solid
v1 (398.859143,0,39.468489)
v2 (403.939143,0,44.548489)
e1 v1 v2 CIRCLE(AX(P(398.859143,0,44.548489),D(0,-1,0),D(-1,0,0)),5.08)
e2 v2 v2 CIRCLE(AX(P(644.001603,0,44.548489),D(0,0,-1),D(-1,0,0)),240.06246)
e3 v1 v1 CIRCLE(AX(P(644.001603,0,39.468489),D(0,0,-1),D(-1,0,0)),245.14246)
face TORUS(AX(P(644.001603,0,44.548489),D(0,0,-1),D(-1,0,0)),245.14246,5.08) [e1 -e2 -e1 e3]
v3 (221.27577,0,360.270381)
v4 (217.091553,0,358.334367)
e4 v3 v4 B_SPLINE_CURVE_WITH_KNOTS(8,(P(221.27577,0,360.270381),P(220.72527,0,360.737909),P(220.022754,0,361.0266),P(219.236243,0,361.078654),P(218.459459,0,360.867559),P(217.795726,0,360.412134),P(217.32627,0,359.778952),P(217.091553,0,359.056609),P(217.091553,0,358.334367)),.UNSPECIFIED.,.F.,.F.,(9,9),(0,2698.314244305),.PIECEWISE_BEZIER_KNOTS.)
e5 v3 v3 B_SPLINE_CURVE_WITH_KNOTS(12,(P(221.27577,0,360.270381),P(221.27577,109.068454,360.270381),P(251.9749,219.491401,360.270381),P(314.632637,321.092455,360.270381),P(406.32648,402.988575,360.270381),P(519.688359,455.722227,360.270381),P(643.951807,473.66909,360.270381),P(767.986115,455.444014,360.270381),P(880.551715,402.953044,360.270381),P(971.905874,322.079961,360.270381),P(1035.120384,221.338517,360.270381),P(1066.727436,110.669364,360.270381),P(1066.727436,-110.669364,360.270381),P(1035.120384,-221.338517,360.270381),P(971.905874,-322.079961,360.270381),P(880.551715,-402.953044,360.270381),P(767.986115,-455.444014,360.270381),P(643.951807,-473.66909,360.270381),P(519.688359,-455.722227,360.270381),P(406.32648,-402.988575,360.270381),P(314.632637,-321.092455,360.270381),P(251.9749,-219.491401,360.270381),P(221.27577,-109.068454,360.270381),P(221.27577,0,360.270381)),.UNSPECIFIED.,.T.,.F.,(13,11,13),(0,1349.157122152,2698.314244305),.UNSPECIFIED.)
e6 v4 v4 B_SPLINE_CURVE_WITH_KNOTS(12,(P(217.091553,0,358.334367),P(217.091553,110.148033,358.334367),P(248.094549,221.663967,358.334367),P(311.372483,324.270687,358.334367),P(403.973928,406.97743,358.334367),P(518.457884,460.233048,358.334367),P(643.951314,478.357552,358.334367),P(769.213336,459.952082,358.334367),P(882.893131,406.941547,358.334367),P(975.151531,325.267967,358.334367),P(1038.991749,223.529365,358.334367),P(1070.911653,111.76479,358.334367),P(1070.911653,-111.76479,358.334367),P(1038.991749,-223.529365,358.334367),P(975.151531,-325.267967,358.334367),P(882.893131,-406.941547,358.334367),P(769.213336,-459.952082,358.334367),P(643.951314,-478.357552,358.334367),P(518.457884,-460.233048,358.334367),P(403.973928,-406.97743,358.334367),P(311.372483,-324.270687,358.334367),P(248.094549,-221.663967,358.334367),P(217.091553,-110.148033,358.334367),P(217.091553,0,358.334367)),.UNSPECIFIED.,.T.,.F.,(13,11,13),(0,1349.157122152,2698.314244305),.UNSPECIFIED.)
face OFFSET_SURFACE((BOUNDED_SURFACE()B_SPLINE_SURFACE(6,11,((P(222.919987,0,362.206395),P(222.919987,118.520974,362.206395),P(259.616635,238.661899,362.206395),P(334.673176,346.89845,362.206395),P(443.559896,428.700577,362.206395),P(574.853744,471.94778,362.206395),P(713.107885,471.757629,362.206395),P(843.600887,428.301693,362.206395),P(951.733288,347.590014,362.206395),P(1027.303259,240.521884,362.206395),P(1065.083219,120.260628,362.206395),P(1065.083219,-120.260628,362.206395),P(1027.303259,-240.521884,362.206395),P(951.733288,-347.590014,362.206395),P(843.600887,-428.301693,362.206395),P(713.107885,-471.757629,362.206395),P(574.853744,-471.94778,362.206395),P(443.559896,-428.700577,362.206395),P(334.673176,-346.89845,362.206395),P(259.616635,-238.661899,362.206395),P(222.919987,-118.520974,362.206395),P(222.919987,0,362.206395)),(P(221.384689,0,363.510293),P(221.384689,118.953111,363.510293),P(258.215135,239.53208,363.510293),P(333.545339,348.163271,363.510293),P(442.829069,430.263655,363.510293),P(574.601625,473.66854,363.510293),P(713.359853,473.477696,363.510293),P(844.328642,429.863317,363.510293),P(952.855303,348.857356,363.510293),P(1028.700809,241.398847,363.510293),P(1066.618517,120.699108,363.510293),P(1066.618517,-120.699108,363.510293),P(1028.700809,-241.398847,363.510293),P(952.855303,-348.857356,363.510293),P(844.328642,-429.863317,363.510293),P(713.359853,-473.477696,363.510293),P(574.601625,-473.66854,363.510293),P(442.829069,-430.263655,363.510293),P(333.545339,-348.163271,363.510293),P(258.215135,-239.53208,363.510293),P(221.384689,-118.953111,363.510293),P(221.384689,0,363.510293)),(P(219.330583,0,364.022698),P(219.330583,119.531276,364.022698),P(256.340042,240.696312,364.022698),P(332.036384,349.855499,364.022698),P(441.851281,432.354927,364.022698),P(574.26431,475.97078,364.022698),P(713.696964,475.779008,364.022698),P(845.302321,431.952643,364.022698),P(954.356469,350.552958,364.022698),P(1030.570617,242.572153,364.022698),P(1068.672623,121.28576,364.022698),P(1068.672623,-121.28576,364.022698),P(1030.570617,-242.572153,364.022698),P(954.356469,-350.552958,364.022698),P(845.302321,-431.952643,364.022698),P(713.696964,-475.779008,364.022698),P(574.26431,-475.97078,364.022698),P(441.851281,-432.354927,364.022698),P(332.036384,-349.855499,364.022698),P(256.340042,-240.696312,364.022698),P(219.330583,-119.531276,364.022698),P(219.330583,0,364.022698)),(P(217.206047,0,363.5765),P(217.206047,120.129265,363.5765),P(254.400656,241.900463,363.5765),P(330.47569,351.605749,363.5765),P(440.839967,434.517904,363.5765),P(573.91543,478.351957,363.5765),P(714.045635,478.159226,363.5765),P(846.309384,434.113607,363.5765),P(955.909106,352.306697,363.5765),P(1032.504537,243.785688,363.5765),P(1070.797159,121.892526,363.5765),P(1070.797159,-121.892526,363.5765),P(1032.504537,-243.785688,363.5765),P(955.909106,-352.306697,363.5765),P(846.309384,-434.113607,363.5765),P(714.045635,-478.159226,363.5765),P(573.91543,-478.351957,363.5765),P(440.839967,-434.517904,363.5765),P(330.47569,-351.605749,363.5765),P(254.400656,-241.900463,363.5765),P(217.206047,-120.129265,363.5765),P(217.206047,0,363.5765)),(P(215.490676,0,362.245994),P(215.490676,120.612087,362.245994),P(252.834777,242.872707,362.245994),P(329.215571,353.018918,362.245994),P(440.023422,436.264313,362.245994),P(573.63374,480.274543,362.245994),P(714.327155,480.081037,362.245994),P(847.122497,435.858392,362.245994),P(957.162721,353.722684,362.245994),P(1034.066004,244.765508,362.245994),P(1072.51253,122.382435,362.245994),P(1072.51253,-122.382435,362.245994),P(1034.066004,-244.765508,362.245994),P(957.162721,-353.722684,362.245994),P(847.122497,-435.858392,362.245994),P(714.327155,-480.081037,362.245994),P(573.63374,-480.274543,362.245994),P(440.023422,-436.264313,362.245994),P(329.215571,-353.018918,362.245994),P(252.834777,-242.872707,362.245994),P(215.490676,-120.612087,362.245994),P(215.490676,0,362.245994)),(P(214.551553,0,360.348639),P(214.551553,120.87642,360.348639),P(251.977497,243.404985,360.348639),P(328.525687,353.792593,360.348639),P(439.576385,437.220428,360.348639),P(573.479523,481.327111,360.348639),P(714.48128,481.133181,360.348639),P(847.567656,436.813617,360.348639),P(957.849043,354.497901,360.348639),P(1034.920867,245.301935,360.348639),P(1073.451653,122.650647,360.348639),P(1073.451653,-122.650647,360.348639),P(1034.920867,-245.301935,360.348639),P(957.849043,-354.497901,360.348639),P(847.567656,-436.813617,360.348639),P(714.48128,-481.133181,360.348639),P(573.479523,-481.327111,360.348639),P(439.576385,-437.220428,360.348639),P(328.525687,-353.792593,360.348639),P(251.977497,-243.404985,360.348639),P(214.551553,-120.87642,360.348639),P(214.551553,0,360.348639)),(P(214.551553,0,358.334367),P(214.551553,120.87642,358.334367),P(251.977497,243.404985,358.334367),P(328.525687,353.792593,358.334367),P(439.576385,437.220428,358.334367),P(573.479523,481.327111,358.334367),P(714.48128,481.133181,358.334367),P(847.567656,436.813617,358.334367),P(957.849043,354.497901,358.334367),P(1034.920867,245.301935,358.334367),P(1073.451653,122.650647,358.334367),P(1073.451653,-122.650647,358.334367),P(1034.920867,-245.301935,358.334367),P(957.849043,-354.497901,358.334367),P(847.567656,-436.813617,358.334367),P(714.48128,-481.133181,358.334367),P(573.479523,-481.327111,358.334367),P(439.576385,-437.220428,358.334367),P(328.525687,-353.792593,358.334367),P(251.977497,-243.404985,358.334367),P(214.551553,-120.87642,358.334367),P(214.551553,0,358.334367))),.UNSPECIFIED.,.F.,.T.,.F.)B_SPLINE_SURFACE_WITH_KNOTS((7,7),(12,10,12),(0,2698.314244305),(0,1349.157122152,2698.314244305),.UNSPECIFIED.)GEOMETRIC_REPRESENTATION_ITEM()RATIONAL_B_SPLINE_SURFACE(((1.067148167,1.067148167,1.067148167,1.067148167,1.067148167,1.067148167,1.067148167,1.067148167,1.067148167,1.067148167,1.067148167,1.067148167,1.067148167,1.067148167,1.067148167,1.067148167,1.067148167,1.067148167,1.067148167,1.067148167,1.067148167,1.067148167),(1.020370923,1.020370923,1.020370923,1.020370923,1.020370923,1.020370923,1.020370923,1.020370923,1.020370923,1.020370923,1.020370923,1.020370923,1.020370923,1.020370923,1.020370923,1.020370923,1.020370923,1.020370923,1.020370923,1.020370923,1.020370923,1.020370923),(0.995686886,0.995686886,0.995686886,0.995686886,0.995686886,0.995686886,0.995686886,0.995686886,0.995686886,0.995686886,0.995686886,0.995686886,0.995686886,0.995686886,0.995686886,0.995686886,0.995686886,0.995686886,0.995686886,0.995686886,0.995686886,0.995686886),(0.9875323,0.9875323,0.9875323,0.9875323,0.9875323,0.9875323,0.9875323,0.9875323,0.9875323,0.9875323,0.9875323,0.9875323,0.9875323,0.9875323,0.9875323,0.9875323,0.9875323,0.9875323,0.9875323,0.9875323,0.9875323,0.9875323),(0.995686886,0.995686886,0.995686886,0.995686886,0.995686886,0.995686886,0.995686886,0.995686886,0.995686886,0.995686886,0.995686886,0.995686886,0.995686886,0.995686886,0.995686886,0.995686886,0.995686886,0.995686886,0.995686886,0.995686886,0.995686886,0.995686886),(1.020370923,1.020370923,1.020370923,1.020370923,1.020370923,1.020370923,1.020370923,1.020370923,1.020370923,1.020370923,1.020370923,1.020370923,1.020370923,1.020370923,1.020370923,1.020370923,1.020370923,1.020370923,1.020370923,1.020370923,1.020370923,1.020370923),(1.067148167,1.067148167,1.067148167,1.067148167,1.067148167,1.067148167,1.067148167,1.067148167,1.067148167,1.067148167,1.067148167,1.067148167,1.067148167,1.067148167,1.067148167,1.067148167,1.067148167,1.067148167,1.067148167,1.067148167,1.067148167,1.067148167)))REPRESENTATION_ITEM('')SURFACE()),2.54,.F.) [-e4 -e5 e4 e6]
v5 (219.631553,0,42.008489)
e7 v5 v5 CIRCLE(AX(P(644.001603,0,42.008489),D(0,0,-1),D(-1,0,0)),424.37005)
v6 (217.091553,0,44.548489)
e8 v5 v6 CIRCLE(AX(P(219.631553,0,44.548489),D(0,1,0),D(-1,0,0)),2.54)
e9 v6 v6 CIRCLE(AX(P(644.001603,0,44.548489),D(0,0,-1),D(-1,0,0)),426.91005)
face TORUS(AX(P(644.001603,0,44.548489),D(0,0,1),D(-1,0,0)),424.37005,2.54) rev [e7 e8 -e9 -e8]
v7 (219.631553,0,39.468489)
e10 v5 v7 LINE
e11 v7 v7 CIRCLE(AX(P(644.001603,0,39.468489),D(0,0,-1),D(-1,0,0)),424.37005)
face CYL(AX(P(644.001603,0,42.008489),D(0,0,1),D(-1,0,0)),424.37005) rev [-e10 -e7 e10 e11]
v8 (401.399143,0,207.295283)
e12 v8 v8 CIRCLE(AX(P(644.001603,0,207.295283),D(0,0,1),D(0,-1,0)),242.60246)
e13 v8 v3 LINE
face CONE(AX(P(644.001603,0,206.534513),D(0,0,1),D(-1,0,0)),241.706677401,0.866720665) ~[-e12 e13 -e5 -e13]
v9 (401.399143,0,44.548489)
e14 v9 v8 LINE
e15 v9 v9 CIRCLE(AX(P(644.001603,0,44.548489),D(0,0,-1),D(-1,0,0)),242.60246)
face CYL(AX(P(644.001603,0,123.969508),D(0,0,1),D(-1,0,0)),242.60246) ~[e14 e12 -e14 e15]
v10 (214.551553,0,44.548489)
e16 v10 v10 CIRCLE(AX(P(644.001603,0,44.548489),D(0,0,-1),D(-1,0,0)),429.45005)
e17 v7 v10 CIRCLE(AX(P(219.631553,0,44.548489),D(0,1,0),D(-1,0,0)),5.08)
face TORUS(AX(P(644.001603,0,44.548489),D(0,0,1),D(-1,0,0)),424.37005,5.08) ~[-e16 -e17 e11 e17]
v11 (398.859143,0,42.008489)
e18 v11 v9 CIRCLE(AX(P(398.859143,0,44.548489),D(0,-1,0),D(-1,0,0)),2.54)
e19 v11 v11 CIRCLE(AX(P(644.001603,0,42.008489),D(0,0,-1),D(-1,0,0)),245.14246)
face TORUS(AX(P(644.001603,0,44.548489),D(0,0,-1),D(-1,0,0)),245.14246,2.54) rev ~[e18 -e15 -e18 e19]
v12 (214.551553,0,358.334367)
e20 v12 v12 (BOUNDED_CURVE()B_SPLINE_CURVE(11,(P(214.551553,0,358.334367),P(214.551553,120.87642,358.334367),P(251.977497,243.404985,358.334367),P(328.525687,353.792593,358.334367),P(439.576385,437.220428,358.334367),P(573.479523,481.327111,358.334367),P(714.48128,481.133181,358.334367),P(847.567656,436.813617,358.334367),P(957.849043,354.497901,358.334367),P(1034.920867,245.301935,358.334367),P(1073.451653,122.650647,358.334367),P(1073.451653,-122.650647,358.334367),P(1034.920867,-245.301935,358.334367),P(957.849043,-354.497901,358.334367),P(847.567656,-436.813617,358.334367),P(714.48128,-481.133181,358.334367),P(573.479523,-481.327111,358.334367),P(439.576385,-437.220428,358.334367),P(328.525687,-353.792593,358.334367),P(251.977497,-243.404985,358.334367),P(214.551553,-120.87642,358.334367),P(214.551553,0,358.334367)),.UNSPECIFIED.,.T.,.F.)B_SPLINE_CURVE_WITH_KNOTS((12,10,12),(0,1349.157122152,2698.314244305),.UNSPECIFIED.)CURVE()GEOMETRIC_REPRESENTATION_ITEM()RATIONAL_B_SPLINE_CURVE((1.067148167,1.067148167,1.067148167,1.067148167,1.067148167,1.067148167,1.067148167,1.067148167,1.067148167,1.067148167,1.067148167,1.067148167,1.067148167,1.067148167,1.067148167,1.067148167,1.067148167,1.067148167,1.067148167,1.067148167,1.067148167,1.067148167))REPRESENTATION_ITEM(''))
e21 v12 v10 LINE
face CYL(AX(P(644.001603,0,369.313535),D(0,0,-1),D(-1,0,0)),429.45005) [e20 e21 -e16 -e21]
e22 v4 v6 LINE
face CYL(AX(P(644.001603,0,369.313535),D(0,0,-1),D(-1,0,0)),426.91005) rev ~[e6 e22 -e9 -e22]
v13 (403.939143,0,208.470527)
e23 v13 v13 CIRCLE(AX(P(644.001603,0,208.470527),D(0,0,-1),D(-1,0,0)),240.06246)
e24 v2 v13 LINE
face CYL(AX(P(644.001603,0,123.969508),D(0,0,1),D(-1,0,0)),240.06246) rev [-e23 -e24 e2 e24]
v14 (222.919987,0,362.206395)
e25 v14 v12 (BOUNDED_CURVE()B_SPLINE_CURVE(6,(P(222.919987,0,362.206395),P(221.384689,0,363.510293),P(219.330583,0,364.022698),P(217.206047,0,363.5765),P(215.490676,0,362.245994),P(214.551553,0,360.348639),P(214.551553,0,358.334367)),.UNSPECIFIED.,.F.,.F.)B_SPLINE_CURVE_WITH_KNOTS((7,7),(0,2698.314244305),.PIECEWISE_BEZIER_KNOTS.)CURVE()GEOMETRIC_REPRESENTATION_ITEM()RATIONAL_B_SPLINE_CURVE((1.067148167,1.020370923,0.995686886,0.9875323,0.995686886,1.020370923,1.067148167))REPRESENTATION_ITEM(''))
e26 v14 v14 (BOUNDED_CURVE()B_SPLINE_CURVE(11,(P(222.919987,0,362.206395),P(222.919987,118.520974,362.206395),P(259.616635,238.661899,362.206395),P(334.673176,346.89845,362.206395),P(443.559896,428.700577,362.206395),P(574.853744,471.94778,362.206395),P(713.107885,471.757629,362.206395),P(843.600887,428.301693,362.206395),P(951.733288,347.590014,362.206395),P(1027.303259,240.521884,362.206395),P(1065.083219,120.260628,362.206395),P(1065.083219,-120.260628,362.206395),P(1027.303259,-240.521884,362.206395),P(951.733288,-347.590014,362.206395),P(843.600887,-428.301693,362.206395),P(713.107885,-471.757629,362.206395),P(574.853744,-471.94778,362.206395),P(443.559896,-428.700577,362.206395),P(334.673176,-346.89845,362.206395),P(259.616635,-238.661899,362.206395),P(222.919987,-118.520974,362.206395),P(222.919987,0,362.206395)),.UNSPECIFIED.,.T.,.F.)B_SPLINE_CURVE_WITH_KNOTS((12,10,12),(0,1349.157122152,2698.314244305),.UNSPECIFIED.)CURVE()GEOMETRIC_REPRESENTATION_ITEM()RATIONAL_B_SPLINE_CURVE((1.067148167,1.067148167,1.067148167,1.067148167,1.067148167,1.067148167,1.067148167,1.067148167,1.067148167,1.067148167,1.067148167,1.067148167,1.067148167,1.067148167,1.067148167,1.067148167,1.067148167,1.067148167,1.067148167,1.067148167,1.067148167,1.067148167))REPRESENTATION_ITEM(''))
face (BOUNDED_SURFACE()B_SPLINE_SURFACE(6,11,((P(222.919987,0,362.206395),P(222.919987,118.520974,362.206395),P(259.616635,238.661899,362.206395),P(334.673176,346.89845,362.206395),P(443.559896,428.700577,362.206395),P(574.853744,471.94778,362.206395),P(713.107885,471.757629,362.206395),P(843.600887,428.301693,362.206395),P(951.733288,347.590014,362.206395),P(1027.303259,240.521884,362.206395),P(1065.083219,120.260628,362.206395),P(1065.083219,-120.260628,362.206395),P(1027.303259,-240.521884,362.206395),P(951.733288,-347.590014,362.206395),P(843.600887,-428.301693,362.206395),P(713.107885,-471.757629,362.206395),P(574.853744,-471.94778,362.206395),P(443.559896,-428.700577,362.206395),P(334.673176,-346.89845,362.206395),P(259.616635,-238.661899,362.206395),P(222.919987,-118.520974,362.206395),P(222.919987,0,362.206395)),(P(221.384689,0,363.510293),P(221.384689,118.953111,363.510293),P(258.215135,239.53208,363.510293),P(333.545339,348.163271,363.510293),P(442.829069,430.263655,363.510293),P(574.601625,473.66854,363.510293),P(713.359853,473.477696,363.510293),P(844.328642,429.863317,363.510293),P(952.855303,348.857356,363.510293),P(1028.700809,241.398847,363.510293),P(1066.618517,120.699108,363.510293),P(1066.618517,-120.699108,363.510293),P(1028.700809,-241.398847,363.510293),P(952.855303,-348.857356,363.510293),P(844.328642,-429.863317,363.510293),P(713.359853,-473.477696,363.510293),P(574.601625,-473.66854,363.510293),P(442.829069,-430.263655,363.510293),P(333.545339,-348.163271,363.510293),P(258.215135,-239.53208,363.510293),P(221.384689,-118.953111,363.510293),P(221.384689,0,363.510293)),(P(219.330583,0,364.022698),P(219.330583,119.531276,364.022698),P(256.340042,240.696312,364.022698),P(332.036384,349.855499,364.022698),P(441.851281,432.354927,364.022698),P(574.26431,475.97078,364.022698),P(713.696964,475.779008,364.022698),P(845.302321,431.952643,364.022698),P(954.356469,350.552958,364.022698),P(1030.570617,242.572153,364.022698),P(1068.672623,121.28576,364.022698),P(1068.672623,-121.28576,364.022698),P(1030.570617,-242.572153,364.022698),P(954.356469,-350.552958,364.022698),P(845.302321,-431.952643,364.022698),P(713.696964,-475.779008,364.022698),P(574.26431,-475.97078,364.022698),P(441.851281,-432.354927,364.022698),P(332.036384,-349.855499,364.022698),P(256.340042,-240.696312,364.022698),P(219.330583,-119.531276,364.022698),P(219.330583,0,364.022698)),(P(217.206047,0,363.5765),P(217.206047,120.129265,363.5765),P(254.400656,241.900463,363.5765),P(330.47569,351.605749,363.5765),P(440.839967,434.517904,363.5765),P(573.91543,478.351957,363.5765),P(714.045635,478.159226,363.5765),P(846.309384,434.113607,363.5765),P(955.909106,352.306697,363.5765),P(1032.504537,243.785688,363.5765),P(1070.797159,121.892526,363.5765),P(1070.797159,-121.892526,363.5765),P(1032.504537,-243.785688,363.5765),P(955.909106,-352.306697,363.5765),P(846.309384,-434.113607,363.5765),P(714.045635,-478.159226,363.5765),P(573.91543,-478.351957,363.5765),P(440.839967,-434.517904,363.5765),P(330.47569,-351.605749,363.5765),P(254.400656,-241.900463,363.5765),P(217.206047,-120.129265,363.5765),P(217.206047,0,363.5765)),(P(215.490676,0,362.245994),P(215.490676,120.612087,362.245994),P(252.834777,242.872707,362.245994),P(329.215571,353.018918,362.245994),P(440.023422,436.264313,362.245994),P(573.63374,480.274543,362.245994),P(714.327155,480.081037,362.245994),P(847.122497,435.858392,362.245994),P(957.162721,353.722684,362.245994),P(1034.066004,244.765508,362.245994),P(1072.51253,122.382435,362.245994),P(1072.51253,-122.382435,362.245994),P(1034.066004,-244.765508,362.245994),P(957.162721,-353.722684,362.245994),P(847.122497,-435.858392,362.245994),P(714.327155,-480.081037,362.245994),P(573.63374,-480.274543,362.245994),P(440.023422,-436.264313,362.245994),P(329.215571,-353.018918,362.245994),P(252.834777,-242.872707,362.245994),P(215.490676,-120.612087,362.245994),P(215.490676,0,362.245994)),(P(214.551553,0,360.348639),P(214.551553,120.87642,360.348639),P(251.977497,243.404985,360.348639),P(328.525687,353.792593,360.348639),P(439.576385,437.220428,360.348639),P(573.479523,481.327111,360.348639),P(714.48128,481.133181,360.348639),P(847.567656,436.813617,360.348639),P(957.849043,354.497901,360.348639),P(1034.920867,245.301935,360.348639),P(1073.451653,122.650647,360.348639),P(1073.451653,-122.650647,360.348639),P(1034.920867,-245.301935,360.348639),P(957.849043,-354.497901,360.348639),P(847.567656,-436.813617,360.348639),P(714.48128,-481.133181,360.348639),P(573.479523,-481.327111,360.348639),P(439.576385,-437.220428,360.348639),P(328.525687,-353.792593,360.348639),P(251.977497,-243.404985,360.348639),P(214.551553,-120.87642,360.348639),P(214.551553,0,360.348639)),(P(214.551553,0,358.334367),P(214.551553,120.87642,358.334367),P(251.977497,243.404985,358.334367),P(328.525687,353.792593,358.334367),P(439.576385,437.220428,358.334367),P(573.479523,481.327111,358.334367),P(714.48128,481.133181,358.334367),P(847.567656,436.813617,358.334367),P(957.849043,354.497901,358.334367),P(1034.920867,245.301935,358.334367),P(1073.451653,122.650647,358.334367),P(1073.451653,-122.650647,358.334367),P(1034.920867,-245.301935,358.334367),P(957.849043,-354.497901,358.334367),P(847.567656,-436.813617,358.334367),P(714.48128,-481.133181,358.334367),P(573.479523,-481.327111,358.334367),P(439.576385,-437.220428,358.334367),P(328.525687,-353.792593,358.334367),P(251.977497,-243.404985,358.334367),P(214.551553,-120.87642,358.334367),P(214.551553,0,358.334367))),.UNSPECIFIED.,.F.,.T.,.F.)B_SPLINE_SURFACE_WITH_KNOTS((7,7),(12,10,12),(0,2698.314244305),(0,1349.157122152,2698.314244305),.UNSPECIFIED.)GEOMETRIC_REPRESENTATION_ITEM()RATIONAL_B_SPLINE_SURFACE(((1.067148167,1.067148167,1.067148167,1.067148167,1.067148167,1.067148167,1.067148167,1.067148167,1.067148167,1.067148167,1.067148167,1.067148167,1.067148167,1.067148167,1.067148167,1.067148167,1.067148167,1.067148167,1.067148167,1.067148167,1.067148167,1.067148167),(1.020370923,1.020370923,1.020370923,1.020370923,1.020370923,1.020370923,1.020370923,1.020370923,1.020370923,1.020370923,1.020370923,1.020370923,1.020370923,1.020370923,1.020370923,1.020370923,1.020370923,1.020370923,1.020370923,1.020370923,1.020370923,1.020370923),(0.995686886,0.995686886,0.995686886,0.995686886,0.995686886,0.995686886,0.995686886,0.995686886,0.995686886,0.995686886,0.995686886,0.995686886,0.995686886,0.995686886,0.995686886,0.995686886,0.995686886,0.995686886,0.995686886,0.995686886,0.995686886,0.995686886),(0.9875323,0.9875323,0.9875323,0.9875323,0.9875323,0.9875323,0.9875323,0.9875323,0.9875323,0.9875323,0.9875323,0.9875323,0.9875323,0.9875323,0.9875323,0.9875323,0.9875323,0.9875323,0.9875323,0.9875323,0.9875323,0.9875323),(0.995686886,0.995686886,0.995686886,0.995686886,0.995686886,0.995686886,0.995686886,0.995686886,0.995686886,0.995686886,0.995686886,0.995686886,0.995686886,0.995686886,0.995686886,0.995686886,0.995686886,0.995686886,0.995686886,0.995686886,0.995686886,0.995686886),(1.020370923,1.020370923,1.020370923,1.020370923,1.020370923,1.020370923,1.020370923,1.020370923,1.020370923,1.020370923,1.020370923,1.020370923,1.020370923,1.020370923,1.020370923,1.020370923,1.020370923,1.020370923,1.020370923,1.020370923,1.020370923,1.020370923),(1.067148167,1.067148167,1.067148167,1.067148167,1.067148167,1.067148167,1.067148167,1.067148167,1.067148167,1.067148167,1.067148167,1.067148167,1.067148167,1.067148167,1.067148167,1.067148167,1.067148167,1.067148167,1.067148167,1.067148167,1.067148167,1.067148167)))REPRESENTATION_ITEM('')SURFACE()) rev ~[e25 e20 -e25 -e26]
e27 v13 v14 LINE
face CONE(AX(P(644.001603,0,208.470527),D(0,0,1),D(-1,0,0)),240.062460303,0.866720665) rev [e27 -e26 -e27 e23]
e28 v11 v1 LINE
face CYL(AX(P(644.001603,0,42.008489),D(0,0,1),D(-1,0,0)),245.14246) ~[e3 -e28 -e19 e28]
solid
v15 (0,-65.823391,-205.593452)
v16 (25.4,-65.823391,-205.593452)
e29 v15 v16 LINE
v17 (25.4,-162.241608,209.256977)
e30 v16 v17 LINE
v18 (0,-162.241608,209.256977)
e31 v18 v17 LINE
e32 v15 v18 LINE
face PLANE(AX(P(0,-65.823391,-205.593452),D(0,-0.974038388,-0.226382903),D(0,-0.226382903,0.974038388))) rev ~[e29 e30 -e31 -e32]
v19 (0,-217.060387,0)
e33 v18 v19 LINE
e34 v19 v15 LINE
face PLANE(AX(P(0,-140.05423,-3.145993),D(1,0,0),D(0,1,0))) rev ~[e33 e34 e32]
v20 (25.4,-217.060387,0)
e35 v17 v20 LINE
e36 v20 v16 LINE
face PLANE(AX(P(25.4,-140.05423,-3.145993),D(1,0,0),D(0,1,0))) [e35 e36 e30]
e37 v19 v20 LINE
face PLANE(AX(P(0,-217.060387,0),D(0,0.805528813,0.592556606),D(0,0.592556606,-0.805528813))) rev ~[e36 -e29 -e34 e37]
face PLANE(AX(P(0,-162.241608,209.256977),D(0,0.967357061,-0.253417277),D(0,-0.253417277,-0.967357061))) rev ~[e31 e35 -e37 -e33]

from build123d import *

# Parameters (mm, degrees)
F0_W     = 165.3737425804
F0_H     = 124.4190223515
F1_DEPTH = 25.4
F3_W     = 115.6221553683
F3_H     = 126.1607408524
F3_W_2   = 170.5438941717
F3_H_2   = 219.3448096514
F4_T     = -2.54
F4_2_T   = -2.54
F6_DEPTH = 25.4
F7_W     = 189.3875896931
F7_H     = 169.002037769
F9_R     = 5.08
F10_T    = -2.54


# Not quite as in the source:
# - a shell that OpenCascade refuses in one call is made with other operations: the cavity is built on its own and cut out


with BuildPart() as f1:
    # F0 (on Front) → F1 (new body)
    with BuildSketch(Plane.XZ):
        with Locations((-11.4489495754, -2.2449400276)):
            Rectangle(F0_W, F0_H)
    extrude(amount=F1_DEPTH)

    # F3 (on Right) → F11, piece 2 (revolve)
    with BuildSketch(Plane.YZ):
        with Locations((100.368924439, 45.5251559615)):
            Rectangle(F3_W_2, F3_H_2)
    revolve(axis=Axis((71.2379217148, -25.4, -2.2449400276), (0, 0, -1)))

    # F4#2
    f4_2_openings = [f1.faces().sort_by_distance(p)[0] for p in [
        (140.460931, -230.471734, 155.197561),
    ]]
    offset(amount=F4_2_T, openings=f4_2_openings, kind=Kind.INTERSECTION)


with BuildPart() as f11:
    # F3 (on Right) → F11 (revolve)
    with BuildSketch(Plane.YZ):
        with Locations((128.4491606057, 218.544781208)):
            Rectangle(F3_W, F3_H)
    revolve(axis=Axis((71.2379217148, -25.4, -2.2449400276), (0, 0, -1)))

    # F4
    f4_openings = [f11.faces().sort_by_distance(p)[0] for p in [
        (140.460931, -231.073583, 281.625152),
    ]]
    offset(amount=F4_T, openings=f4_openings)


with BuildPart() as f6:
    # F2 (on Right) → F6 (new body)
    with BuildSketch(Plane.YZ):
        Polygon((-162.2416079044, 209.2569768429), (-217.0603871346, 0), (-65.8233910799, -205.5934518576), align=None)
    extrude(amount=F6_DEPTH)


with BuildPart() as f8:
    # F7 (on Front) → F8 (revolve)
    with BuildSketch(Plane.XZ):
        with Locations((309.2453479767, 123.9695076462)):
            Rectangle(F7_W, F7_H)
        Polygon((214.5515531301, 208.4705265307), (403.9391428232, 208.4705265307), (214.5515531301, 369.3135349012), align=None)
    revolve(axis=Axis((644.0016031265, 0, 168.0627539754), (0, 0, -1)))

    # F9
    f9_edges = [f8.edges().sort_by_distance(p)[0] for p in [
        (1073.451653, 0, 369.313535),
        (1073.451653, 0, 39.468489),
        (884.064063, 0, 39.468489),
    ]]
    fillet(f9_edges, radius=F9_R)

    # F10: a shell. OpenCascade refuses it in one call, so the cavity is built on its own and cut out:
    # the body offset inwards by the wall thickness, plus a prism from it out through each open face.
    f10_core = offset(f8.part, amount=F10_T, mode=Mode.PRIVATE)
    f10_exits = [f10_core.faces().sort_by_distance(p)[0] for p in [
        (1056.368656, 0, 42.008489),
    ]]
    add(f10_core, mode=Mode.SUBTRACT)
    extrude(f10_exits, amount=-F10_T, mode=Mode.SUBTRACT)


solid = Compound([f6.part, f8.part])
